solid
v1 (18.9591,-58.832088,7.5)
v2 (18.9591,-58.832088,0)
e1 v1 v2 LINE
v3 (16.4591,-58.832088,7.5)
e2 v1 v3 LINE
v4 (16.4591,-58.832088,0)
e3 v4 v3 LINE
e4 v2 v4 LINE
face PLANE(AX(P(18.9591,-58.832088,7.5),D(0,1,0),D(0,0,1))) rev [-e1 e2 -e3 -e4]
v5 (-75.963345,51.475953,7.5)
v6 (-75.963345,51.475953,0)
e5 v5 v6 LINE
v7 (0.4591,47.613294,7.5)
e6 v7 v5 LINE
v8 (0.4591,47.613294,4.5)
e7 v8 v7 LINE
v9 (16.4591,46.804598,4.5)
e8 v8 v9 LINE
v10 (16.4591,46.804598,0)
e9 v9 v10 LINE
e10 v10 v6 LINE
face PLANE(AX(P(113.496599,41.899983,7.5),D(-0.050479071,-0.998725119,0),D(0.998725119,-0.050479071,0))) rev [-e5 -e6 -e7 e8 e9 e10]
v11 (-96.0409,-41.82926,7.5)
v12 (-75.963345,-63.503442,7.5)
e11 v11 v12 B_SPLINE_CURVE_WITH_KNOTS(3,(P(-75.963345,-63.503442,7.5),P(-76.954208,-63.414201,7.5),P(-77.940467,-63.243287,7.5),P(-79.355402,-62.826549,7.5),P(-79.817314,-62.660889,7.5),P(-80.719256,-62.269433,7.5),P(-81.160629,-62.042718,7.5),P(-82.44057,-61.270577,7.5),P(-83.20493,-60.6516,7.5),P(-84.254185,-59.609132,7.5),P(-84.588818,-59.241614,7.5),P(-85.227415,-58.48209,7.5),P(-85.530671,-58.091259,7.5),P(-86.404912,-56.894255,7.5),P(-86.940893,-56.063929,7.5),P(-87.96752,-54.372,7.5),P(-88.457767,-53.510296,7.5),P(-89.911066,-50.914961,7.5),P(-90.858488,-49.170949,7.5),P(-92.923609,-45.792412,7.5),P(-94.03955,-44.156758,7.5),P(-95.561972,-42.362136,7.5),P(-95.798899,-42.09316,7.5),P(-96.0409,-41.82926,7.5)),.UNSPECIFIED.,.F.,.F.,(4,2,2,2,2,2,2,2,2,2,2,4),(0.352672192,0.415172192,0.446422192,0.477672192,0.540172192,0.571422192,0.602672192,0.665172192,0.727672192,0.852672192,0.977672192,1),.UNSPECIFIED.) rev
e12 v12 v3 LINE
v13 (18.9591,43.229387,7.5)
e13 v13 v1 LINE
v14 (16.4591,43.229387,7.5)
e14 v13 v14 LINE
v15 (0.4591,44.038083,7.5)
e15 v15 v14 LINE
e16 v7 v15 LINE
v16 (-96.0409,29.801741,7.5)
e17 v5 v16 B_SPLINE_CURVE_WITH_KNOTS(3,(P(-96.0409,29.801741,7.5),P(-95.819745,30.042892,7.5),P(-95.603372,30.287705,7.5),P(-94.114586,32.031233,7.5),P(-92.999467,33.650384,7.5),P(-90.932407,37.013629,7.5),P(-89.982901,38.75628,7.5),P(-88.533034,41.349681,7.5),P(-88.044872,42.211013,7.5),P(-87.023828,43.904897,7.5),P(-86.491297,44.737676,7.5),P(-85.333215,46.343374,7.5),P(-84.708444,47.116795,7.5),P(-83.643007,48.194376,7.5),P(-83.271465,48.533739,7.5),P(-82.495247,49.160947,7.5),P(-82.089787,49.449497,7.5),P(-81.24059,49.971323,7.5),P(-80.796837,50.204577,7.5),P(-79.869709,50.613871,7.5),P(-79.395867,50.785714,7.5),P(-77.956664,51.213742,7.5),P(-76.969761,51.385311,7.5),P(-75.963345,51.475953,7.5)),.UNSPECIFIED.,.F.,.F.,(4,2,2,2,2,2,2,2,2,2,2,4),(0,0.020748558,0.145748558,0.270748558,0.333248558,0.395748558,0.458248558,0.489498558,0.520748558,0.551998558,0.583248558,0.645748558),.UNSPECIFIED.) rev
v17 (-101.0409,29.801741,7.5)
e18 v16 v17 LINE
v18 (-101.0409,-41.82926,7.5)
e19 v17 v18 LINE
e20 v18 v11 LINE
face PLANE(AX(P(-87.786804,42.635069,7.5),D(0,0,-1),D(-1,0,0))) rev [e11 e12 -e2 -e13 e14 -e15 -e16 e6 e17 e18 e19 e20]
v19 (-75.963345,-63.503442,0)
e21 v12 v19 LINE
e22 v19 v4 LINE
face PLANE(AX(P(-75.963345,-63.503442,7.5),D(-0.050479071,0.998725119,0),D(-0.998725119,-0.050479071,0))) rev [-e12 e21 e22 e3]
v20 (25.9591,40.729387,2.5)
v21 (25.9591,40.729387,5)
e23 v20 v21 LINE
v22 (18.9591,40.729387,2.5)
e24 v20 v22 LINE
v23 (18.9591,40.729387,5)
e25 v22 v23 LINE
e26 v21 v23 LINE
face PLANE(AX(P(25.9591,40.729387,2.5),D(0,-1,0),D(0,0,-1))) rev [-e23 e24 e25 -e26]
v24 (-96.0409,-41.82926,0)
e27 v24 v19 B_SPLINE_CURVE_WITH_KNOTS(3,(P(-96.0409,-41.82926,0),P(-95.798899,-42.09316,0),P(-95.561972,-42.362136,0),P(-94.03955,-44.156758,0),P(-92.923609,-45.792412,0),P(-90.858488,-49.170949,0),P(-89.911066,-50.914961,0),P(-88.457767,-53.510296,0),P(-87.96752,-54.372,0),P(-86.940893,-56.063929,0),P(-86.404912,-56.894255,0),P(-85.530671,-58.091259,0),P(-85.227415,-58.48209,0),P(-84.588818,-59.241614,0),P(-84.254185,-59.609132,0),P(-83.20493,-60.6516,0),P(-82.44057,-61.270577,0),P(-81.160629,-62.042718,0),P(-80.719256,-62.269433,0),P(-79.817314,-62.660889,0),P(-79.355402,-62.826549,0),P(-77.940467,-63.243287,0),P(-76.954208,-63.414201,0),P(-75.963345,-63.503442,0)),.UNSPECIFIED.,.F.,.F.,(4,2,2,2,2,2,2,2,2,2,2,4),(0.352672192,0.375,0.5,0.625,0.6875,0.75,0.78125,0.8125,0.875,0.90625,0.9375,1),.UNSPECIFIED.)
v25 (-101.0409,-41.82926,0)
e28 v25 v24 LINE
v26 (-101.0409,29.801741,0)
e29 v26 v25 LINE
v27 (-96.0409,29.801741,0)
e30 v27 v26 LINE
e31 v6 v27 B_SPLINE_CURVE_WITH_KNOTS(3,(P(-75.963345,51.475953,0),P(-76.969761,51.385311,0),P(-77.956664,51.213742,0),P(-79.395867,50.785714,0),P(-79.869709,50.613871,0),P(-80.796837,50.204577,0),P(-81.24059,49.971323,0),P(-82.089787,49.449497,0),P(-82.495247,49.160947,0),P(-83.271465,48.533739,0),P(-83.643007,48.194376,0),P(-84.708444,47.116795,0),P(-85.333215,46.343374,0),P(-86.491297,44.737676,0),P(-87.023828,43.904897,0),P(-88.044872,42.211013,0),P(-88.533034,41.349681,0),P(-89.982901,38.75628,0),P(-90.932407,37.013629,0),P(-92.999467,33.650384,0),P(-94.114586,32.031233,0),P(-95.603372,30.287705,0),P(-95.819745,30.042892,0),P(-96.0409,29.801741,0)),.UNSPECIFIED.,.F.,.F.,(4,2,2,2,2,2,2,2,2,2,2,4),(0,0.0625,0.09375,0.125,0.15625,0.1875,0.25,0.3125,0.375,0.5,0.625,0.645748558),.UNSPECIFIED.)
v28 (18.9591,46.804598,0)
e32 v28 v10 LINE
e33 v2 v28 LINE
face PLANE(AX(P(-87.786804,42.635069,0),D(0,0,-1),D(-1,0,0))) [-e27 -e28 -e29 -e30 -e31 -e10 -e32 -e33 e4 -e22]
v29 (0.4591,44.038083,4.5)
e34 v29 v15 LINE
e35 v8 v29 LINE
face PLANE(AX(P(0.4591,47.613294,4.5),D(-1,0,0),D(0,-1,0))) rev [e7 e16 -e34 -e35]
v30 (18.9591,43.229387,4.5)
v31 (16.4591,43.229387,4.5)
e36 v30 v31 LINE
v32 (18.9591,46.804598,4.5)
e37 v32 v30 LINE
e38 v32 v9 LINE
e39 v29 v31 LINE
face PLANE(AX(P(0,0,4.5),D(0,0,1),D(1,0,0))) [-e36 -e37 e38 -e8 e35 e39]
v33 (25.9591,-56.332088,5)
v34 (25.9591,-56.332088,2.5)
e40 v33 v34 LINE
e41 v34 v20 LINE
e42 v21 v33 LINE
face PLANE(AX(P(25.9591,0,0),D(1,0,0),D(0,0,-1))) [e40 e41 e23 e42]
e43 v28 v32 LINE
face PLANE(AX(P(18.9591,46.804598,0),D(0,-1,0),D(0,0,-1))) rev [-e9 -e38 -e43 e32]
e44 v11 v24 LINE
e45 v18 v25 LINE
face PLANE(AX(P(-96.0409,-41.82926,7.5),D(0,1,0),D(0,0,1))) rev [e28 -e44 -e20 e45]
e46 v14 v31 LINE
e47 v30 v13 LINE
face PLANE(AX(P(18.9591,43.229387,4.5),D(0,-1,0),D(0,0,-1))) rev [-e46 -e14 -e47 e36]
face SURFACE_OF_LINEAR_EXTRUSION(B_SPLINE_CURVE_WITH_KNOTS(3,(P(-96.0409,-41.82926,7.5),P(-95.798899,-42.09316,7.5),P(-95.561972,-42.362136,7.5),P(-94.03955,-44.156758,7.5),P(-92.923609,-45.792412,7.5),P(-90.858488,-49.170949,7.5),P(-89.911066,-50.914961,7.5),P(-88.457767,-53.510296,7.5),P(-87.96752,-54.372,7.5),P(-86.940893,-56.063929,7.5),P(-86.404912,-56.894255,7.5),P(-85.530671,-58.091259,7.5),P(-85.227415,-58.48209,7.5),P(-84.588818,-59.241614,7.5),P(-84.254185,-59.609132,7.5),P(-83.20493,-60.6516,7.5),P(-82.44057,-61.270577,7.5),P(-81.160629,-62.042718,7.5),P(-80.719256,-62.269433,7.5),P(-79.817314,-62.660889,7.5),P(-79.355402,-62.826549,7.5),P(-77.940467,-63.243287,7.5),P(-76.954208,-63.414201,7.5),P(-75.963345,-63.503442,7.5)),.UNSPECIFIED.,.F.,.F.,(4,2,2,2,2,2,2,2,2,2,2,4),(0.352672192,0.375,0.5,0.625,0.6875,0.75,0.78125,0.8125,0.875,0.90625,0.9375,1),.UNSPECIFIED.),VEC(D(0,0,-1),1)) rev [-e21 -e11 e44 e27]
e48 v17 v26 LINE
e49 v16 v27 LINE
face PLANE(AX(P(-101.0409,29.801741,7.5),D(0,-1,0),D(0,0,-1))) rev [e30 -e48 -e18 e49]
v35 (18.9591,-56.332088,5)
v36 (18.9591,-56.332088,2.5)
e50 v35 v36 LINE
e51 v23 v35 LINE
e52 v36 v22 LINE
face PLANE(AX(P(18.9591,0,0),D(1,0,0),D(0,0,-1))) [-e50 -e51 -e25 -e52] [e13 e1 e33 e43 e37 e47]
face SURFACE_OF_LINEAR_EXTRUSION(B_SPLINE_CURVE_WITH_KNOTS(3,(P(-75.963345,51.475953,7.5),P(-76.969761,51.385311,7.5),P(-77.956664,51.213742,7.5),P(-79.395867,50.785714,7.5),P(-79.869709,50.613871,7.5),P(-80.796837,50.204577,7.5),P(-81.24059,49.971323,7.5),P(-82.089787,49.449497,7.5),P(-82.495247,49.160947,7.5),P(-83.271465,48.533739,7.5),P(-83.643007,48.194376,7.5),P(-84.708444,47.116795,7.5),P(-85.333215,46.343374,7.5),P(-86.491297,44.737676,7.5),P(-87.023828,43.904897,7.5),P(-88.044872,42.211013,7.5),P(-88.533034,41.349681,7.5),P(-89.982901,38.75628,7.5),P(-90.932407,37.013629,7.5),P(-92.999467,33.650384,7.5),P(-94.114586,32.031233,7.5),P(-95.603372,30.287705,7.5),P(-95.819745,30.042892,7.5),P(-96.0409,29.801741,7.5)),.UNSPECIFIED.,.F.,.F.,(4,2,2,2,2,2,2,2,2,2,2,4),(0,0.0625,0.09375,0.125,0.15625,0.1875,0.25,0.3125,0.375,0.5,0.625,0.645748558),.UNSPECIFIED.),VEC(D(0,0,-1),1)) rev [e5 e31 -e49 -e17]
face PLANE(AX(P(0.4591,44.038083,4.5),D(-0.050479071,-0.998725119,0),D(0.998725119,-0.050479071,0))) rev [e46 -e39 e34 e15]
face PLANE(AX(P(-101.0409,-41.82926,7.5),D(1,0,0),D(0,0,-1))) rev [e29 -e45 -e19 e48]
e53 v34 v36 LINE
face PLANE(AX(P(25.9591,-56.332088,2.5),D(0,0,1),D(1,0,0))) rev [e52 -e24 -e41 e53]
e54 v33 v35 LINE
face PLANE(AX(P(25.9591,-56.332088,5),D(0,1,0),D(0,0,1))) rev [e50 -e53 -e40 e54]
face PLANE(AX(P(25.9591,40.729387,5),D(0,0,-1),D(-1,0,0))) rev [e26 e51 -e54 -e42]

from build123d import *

# Parameters (mm, degrees)
STOCK_BATTERY_BASE_1_DEPTH   = 7.5
STOCK_BATTERY_BASE_1_2_DEPTH = 4.5
BOSS_EXTRUDE1_DEPTH          = 2.5
SKETCH2_W                    = 2.5
SKETCH2_H                    = 97.061474856
BOSS_EXTRUDE2_DEPTH          = 7


# Read off the part's stored shape, not the designer's step: Stock-battery base-1
with BuildPart() as part:
    # Stock-battery base-1 outline → Stock-battery base-1 (new body)
    with BuildSketch(Plane.XY):
        with BuildLine():
            Line((16.459100066, -58.832087736), (16.459100066, 43.22938712))
            Line((16.459100066, 43.22938712), (0.459100066, 44.038083245))
            Line((0.459100066, 44.038083245), (0.459100066, 47.61329436))
            Line((0.459100066, 47.61329436), (-75.963345356, 51.475952827))
            add(Edge.make_bspline(
                [(-75.963345356, 51.475952827), (-76.969760945, 51.385311169), (-77.956664013, 51.213742336), (-79.395866789, 50.78571401), (-79.86970863, 50.613871194), (-80.796837185, 50.204577199), (-81.240590365, 49.971323111), (-82.089787414, 49.449496549), (-82.495246976, 49.160946736), (-83.271465049, 48.533739024), (-83.643007435, 48.194375714), (-84.708444042, 47.116795042), (-85.333215001, 46.343374139), (-86.491296884, 44.737676097), (-87.023827607, 43.904896882), (-88.044872363, 42.211012893), (-88.533034054, 41.34968138), (-89.982900727, 38.756279626), (-90.93240726, 37.013628654), (-92.999467157, 33.650383947), (-94.114586107, 32.031232641), (-95.60337212, 30.287705281), (-95.819744565, 30.042891916), (-96.040899934, 29.801740739)],
                knots=[0, 0, 0, 0, 0.0625, 0.0625, 0.09375, 0.09375, 0.125, 0.125, 0.15625, 0.15625, 0.1875, 0.1875, 0.25, 0.25, 0.3125, 0.3125, 0.375, 0.375, 0.5, 0.5, 0.625, 0.625, 0.645748558, 0.645748558, 0.645748558, 0.645748558], degree=3))
            Line((-96.040899934, 29.801740739), (-101.040899934, 29.801740739))
            Line((-101.040899934, 29.801740739), (-101.040899934, -41.829259963))
            Line((-101.040899934, -41.829259963), (-96.040899934, -41.829259963))
            add(Edge.make_bspline(
                [(-96.040899934, -41.829259963), (-95.798899268, -42.093160096), (-95.56197213, -42.362136183), (-94.03954966, -44.156758027), (-92.923608678, -45.792412437), (-90.858487716, -49.170948695), (-89.911065512, -50.914960796), (-88.457766632, -53.51029646), (-87.967520262, -54.371999904), (-86.940892781, -56.06392928), (-86.404912323, -56.894254814), (-85.530671439, -58.091259413), (-85.227414802, -58.482089731), (-84.588818098, -59.241614046), (-84.254184704, -59.609132259), (-83.204929916, -60.651600397), (-82.440569541, -61.270576891), (-81.160629249, -62.042718444), (-80.719255742, -62.269433113), (-79.817314106, -62.660888928), (-79.3554021, -62.826549047), (-77.940467092, -63.243286827), (-76.954208328, -63.414201398), (-75.963345356, -63.503442328)],
                knots=[0.352672192, 0.352672192, 0.352672192, 0.352672192, 0.375, 0.375, 0.5, 0.5, 0.625, 0.625, 0.6875, 0.6875, 0.75, 0.75, 0.78125, 0.78125, 0.8125, 0.8125, 0.875, 0.875, 0.90625, 0.90625, 0.9375, 0.9375, 1, 1, 1, 1], degree=3))
            Line((-75.963345356, -63.503442328), (16.459100066, -58.832087736))
        make_face()
    extrude(amount=STOCK_BATTERY_BASE_1_DEPTH)

    # Stock-battery base-1 2 outline → Stock-battery base-1 2 (add)
    with BuildSketch(Plane.XY):
        Polygon((16.459100066, 43.22938712), (16.459100066, 46.804598235), (0.459100066, 47.61329436), (0.459100066, 44.038083245), align=None)
    extrude(amount=STOCK_BATTERY_BASE_1_2_DEPTH)

    # Sketch1 → Boss-Extrude1 (add)
    with BuildSketch(Plane(origin=(16.459100066, 0, 0), x_dir=(0, 0, -1), z_dir=(1, 0, 0))):
        Polygon((0, -58.832087736), (0, 46.804598235), (-4.5, 46.804598235), (-4.5, 43.22938712), (-7.5, 43.22938712), (-7.5, -58.832087736), align=None)
    extrude(amount=BOSS_EXTRUDE1_DEPTH)

    # Sketch2 → Boss-Extrude2 (add)
    with BuildSketch(Plane(origin=(18.959100066, 0, 0), x_dir=(0, 0, -1), z_dir=(1, 0, 0))):
        with Locations((-3.75, -7.801350308)):
            Rectangle(SKETCH2_W, SKETCH2_H)
    extrude(amount=BOSS_EXTRUDE2_DEPTH)


solid = part.part
